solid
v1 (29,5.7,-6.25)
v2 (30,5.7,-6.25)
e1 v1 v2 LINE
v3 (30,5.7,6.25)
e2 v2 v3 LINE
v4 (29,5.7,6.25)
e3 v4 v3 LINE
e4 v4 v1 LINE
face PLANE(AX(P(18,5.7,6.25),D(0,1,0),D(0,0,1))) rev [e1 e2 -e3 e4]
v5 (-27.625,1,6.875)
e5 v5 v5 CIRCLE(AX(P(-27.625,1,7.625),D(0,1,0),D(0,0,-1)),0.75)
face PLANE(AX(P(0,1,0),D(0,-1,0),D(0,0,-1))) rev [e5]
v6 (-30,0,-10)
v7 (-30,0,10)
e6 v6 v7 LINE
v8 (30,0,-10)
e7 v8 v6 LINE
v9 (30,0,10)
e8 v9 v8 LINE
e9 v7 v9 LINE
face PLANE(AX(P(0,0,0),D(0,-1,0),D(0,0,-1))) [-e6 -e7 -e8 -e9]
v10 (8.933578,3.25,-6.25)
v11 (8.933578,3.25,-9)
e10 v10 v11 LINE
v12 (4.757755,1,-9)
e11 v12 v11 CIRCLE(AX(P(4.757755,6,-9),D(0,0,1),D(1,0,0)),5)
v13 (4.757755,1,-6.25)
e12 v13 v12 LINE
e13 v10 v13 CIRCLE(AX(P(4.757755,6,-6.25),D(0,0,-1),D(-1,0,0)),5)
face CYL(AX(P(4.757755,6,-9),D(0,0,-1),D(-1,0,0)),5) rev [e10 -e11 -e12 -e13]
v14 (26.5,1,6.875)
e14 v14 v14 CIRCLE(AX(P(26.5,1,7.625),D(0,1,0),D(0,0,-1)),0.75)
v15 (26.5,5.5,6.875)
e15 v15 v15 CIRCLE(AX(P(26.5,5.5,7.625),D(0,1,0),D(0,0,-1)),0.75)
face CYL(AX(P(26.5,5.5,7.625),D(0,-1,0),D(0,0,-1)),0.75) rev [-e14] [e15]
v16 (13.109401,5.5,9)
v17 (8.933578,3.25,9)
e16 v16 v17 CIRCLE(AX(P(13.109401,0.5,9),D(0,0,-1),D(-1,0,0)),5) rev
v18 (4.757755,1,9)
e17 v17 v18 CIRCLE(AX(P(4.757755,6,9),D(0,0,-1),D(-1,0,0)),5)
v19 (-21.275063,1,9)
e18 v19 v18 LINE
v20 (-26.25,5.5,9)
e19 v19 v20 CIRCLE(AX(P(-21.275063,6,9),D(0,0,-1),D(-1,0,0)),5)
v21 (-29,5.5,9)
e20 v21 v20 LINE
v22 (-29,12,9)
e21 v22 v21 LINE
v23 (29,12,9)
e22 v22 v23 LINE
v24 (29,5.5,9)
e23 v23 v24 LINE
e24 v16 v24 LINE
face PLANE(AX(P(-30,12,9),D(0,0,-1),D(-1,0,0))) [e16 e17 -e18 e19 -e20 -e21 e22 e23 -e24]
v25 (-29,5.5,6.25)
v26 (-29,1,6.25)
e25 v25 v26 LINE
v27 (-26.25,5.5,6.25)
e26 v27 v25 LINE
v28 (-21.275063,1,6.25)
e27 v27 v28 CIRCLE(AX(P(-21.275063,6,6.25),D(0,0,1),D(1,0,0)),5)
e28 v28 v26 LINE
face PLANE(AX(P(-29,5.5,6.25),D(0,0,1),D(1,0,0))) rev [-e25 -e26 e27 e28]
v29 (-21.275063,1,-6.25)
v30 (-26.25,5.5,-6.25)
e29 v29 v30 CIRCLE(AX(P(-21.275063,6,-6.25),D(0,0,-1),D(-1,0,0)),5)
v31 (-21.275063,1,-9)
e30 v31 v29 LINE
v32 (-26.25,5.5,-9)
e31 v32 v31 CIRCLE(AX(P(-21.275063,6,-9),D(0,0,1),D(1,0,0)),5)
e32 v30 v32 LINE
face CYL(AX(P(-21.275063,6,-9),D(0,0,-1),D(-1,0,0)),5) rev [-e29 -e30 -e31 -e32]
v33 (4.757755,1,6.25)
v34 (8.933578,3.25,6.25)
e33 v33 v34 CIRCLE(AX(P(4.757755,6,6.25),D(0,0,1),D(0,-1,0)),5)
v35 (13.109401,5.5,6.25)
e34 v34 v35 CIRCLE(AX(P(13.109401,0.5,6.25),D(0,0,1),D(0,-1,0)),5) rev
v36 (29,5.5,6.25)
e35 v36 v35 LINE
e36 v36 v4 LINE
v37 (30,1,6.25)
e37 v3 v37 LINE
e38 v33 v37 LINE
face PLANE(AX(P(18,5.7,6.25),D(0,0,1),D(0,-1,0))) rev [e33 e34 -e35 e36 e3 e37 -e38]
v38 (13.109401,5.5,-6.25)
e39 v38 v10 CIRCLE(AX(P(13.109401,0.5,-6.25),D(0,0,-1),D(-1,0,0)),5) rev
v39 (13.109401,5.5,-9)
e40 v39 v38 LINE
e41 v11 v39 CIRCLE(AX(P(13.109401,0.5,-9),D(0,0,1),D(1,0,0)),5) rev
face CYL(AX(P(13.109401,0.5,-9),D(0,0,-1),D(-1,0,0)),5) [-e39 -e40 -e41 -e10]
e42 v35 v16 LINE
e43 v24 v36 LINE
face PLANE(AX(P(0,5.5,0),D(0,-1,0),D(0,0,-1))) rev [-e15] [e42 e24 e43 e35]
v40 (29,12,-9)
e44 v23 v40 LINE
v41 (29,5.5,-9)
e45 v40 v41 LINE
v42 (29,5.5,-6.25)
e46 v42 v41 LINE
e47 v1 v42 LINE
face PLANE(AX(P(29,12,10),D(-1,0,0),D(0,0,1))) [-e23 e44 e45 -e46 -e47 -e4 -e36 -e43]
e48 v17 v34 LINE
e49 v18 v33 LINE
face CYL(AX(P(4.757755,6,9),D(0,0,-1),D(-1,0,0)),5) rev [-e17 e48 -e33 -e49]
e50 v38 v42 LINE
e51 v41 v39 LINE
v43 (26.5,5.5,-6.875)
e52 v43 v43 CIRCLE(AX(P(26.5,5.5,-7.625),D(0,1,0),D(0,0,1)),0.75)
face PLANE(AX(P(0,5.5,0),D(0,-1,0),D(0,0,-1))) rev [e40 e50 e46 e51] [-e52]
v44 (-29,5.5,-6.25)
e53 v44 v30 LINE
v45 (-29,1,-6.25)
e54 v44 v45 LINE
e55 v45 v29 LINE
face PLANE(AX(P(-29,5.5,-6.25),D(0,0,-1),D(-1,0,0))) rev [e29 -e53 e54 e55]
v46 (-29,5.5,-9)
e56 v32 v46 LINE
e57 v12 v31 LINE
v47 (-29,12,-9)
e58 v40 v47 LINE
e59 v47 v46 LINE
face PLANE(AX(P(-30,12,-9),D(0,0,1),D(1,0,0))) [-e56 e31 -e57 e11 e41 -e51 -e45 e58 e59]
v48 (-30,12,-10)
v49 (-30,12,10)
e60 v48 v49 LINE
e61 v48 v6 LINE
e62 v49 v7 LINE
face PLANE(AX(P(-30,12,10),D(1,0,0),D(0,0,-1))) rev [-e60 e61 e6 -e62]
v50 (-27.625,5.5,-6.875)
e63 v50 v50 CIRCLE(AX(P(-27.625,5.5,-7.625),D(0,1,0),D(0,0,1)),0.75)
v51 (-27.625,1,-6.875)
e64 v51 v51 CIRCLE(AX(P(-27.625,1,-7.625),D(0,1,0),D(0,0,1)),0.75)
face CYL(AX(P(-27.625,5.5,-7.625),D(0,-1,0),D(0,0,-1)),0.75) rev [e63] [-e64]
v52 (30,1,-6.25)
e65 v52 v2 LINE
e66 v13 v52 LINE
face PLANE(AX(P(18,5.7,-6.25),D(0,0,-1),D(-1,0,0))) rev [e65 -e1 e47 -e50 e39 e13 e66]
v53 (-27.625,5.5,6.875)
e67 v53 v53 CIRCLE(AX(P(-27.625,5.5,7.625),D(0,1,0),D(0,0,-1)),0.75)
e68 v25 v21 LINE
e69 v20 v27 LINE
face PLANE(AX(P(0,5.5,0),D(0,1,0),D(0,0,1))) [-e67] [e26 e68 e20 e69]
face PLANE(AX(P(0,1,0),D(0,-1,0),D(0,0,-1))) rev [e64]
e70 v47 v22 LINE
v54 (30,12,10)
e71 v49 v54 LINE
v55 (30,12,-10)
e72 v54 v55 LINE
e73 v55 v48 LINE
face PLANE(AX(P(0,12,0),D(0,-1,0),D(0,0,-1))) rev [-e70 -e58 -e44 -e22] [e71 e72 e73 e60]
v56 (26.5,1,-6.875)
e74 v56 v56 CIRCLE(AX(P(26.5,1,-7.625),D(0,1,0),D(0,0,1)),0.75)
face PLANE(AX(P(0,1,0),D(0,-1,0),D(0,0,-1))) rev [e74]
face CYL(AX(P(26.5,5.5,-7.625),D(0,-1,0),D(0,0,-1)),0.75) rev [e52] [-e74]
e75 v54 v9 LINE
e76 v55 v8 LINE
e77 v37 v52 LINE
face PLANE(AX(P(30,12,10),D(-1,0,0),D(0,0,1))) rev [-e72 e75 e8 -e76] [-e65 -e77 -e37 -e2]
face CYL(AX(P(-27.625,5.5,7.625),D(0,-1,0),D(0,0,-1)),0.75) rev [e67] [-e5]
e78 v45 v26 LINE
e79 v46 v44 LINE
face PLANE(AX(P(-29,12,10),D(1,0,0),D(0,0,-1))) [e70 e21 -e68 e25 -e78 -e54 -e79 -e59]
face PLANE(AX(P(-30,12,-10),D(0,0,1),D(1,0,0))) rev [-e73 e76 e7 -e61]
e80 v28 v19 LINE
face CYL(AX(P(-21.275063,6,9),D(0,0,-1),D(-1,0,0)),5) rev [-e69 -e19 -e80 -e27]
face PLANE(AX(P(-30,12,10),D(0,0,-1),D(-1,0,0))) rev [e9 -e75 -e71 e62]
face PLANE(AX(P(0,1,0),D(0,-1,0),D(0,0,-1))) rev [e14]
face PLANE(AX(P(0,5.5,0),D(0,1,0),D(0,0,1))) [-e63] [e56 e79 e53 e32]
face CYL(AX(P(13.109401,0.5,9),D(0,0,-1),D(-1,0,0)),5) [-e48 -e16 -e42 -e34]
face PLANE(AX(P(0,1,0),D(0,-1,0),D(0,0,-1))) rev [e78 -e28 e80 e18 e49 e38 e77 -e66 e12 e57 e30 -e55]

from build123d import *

# Parameters (mm, degrees)
SKETCH1_W           = 60
SKETCH1_H           = 20
BOSS_EXTRUDE1_DEPTH = 12
SHELL1_T            = -1
SKETCH2_W           = 12.5
SKETCH2_H           = 4.7
CUT_EXTRUDE1_DEPTH  = 12
SKETCH3_W           = 19.267308131
SKETCH3_H           = 2.75
SKETCH3_R           = 0.75
SKETCH3_W_2         = 2.75
BOSS_EXTRUDE2_DEPTH = 4.5
FILLET1_R           = 5
FILLET2_R           = 5


with BuildPart() as part:
    # Sketch1 → Boss-Extrude1 (new body)
    with BuildSketch(Plane(origin=(0, 0, 0), x_dir=(1, 0, 0), z_dir=(0, 1, 0))):
        Rectangle(SKETCH1_W, SKETCH1_H)
    extrude(amount=BOSS_EXTRUDE1_DEPTH)

    # Shell1
    shell1_openings = [part.faces().sort_by_distance(p)[0] for p in [
        (0, 12, 0),
    ]]
    offset(amount=SHELL1_T, openings=shell1_openings, kind=Kind.INTERSECTION)

    # Sketch2 → Cut-Extrude1 (cut)
    with BuildSketch(Plane(origin=(30, 0, 0), x_dir=(0, 0, -1), z_dir=(1, 0, 0))):
        with Locations((0, 3.35)):
            Rectangle(SKETCH2_W, SKETCH2_H)
    extrude(amount=-CUT_EXTRUDE1_DEPTH, mode=Mode.SUBTRACT)

    # Sketch3 → Boss-Extrude2 (add)
    # profile 1 of 4: a face of its own
    with BuildSketch(Plane(origin=(0, 1, 0), x_dir=(1, 0, 0), z_dir=(0, 1, 0))):
        with Locations((19.366345935, 7.625)):
            Rectangle(SKETCH3_W, SKETCH3_H)
        with Locations(Location((26.5, 7.625, 0), (0, 0, 270))):
            Circle(SKETCH3_R, mode=Mode.SUBTRACT)
    # profile 2 of 4: a face of its own
    with BuildSketch(Plane(origin=(0, 1, 0), x_dir=(1, 0, 0), z_dir=(0, 1, 0))):
        with Locations((-27.625, 7.625)):
            Rectangle(SKETCH3_W_2, SKETCH3_H)
        with Locations(Location((-27.625, 7.625, 0), (0, 0, 270))):
            Circle(SKETCH3_R, mode=Mode.SUBTRACT)
    # profile 3 of 4: a face of its own
    with BuildSketch(Plane(origin=(0, 1, 0), x_dir=(1, 0, 0), z_dir=(0, 1, 0))):
        with Locations((-27.625, -7.625)):
            Rectangle(SKETCH3_W_2, SKETCH3_H)
        with Locations(Location((-27.625, -7.625, 0), (0, 0, 90))):
            Circle(SKETCH3_R, mode=Mode.SUBTRACT)
    # profile 4 of 4: a face of its own
    with BuildSketch(Plane(origin=(0, 1, 0), x_dir=(1, 0, 0), z_dir=(0, 1, 0))):
        with Locations((19.366345935, -7.625)):
            Rectangle(SKETCH3_W, SKETCH3_H)
        with Locations(Location((26.5, -7.625, 0), (0, 0, 90))):
            Circle(SKETCH3_R, mode=Mode.SUBTRACT)
    extrude(amount=BOSS_EXTRUDE2_DEPTH)

    # Fillet1
    # the kernel refuses this fillet: 5 mm, written as the material it adds along each edge
    with BuildSketch(Plane(origin=(-26.25, 1, 9), x_dir=(1, 0, 0), z_dir=(0, 0, -1))) as fillet1_piece_1:
        with BuildLine():
            CenterArc((4.974937186, -5), FILLET1_R, 90, 84.260829523)
            Line((0, -4.5), (-0.099498744, -4.49))
            ThreePointArc((-0.099498744, -4.49), (-0.1, -2.25), (-0.1, 0))
            Line((-0.1, 0), (0, 0.1))
            Line((0, 0.1), (4.974937186, 0.1))
            Line((4.974937186, 0.1), (4.974937186, 0))
        make_face()
    extrude(amount=2.75)
    with BuildSketch(Plane(origin=(-26.25, 1, -9), x_dir=(1, 0, 0), z_dir=(0, 0, 1)), Plane(origin=(9.732691869, 1, 9), x_dir=(-1, 0, 0), z_dir=(0, 0, -1))) as fillet1_piece_2:
        with BuildLine():
            CenterArc((4.974937186, 5), FILLET1_R, 185.739170477, 84.260829523)
            Line((0, 4.5), (-0.099498744, 4.49))
            ThreePointArc((-0.099498744, 4.49), (-0.1, 2.25), (-0.1, 0))
            Line((-0.1, 0), (0, -0.1))
            Line((0, -0.1), (4.974937186, -0.1))
            Line((4.974937186, -0.1), (4.974937186, 0))
        make_face()
    extrude(amount=2.75)
    with BuildSketch(Plane(origin=(9.732691869, 1, -9), x_dir=(0, 1, 0), z_dir=(0, 0, 1))) as fillet1_piece_3:
        with BuildLine():
            CenterArc((5, 4.974937186), FILLET1_R, 180, 84.260829523)
            Line((0, 4.974937186), (-0.1, 4.974937186))
            Line((-0.1, 4.974937186), (-0.1, 0))
            Line((-0.1, 0), (0, -0.1))
            ThreePointArc((0, -0.1), (2.25, -0.1), (4.49, -0.099498744))
            Line((4.49, -0.099498744), (4.5, 0))
        make_face()
    extrude(amount=2.75)

    # Fillet2
    fillet2_edges = [part.edges().sort_by_distance(p)[0] for p in [
        (9.732691869, 5.5, -7.625),
        (9.732691869, 5.5, 7.625),
    ]]
    fillet(fillet2_edges, radius=FILLET2_R)


solid = part.part
